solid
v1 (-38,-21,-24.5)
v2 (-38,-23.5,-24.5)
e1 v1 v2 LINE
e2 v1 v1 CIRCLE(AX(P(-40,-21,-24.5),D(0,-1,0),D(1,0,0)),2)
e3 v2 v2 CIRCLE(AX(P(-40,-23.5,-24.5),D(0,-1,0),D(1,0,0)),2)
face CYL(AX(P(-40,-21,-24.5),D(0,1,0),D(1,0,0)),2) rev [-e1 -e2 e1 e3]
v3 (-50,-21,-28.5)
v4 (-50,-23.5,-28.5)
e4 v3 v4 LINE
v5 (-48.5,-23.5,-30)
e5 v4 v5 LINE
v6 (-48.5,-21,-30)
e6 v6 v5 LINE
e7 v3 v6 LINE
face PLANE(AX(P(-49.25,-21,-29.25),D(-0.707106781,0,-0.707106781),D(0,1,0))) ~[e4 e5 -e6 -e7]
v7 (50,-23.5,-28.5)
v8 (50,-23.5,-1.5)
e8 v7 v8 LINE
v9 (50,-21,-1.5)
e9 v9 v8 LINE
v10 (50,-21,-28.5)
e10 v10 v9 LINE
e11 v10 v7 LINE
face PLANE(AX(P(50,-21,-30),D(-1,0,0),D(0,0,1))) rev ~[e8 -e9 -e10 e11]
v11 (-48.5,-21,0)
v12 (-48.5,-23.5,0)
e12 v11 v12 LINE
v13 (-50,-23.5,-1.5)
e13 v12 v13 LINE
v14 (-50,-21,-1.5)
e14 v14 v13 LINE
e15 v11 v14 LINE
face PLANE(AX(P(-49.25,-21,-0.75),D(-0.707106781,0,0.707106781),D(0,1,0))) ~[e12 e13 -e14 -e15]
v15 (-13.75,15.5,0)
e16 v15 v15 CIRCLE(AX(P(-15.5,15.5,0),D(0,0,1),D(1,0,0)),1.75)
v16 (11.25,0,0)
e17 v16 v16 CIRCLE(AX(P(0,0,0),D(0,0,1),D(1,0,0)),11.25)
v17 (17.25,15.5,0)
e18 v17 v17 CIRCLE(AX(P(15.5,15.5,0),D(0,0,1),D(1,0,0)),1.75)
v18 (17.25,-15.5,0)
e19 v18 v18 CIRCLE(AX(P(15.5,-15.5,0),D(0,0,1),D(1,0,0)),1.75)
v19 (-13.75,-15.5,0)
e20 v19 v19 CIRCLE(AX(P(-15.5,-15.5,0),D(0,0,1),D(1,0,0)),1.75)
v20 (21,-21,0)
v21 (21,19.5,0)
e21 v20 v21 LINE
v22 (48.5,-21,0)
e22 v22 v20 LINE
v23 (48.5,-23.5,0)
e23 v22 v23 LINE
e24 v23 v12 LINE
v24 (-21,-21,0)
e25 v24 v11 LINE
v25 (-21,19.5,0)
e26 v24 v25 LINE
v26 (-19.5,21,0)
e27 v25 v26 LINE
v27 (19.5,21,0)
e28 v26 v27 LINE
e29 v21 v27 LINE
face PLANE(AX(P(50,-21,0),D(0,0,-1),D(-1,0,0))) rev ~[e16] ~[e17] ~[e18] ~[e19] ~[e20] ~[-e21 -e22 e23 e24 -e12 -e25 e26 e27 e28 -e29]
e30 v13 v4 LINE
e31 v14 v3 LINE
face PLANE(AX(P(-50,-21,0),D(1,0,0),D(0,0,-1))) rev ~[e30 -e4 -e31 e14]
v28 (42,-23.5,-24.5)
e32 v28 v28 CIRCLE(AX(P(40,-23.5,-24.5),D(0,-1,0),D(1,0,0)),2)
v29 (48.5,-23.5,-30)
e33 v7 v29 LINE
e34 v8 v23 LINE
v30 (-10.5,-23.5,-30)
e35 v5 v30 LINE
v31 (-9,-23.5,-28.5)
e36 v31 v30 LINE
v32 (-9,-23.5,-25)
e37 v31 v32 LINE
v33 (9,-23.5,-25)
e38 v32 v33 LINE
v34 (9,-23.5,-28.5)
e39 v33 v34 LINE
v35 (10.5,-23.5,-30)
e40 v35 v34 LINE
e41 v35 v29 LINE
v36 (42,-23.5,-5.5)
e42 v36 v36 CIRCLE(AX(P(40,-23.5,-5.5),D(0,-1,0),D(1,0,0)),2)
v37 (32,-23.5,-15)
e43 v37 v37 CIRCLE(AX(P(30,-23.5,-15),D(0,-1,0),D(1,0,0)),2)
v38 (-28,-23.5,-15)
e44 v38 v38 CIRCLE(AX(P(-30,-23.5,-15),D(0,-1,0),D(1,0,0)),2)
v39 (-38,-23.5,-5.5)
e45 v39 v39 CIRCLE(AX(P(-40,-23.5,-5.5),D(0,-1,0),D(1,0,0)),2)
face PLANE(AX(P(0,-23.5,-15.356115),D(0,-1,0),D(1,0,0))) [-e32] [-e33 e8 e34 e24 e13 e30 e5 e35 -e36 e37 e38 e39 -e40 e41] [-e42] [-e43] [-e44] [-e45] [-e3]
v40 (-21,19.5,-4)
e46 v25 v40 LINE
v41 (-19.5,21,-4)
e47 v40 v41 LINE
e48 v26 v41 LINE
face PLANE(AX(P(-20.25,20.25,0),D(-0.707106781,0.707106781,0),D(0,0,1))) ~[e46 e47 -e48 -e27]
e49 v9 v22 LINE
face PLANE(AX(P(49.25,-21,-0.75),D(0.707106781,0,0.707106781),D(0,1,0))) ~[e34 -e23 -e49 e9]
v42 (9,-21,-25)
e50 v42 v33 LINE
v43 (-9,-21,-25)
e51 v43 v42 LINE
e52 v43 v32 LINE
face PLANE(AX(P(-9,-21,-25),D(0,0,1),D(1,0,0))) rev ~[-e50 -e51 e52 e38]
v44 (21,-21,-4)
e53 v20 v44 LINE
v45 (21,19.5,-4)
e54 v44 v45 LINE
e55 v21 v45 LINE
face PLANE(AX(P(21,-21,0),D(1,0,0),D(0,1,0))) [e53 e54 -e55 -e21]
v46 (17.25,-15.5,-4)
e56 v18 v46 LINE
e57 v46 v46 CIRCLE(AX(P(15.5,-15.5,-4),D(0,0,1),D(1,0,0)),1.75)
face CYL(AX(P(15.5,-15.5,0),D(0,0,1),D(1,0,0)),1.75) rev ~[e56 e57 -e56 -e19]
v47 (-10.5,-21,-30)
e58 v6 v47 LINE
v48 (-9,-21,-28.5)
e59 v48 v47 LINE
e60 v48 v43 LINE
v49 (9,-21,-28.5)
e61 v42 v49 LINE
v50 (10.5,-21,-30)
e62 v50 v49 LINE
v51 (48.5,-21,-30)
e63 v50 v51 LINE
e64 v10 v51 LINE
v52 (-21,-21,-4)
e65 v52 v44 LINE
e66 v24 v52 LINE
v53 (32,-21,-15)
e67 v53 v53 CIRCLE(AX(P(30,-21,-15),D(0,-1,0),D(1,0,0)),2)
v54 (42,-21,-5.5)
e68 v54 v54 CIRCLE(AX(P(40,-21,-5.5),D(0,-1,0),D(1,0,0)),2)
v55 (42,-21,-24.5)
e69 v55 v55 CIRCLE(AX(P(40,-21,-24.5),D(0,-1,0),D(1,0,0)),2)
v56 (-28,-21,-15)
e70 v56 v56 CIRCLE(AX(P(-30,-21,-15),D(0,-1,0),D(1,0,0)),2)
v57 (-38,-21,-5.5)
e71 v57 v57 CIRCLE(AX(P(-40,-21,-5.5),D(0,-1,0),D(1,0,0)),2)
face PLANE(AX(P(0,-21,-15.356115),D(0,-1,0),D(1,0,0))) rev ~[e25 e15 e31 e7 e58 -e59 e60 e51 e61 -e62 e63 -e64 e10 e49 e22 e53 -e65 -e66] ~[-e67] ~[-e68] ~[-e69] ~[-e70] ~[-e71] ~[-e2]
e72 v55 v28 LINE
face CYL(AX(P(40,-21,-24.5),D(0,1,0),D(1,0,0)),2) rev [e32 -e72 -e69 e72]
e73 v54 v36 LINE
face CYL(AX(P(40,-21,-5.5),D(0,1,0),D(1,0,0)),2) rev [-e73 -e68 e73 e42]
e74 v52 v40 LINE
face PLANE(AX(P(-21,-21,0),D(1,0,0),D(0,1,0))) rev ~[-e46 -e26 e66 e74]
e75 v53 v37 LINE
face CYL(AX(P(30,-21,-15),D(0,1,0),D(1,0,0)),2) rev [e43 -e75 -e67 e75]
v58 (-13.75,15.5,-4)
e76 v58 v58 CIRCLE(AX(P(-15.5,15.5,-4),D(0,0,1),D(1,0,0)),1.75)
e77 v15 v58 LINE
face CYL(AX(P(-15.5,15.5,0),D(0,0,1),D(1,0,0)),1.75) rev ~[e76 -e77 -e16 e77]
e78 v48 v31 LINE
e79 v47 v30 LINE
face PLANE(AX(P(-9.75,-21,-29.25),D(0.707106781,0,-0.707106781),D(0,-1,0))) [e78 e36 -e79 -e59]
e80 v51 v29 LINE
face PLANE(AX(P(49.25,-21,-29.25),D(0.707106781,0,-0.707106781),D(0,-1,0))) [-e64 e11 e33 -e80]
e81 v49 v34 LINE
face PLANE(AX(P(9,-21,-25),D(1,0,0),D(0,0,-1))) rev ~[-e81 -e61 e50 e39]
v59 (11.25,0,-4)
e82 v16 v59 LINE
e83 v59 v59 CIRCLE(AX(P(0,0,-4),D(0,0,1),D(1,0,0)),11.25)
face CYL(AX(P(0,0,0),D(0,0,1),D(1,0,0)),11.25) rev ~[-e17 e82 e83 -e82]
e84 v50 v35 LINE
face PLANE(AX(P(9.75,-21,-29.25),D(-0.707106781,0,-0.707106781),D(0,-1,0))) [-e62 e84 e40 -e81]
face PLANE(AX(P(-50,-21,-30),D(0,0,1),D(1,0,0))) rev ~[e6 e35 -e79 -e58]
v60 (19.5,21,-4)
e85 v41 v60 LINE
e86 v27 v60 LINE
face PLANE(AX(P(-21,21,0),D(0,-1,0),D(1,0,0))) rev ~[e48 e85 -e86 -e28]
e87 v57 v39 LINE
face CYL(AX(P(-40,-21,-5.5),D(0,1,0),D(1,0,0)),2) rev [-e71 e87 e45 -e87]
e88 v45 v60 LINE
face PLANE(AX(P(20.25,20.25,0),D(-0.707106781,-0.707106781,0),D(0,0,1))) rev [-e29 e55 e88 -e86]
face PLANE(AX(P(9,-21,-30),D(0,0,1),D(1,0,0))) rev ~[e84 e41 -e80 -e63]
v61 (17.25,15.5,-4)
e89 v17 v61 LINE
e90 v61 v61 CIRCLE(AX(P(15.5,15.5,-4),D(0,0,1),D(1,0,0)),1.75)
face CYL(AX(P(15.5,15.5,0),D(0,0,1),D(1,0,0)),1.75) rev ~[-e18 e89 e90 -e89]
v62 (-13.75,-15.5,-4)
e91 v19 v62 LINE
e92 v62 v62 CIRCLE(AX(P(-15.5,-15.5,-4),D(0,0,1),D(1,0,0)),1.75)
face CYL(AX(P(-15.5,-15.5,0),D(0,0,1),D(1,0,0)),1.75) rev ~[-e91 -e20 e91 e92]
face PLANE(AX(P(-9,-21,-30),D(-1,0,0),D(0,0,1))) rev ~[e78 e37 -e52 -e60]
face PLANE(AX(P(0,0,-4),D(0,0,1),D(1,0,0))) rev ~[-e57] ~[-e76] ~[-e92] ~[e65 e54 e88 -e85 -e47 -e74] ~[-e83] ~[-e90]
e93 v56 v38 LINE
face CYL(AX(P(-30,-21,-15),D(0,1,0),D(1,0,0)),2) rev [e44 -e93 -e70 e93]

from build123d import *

# Parameters (mm, degrees)
F0_W     = 42
F0_H     = 42
F0_R     = 1.75
F0_R_2   = 11.25
F1_DEPTH = 4
F2_R     = 2
F2_W     = 42
F2_H     = 4
F3_DEPTH = 2.5
F4_SIZE  = 1.5


# Not quite as in the source:
# - a feature names something its author has since deleted; it is built from what else it names


with BuildPart() as f1:
    # F0 (on Top) → F1 (new body)
    with BuildSketch(Plane.XY):
        Rectangle(F0_W, F0_H)
        with Locations((-15.5, -15.5)):
            Circle(F0_R, mode=Mode.SUBTRACT)
        with Locations((15.5, -15.5)):
            Circle(F0_R, mode=Mode.SUBTRACT)
        with Locations((-15.5, 15.5)):
            Circle(F0_R, mode=Mode.SUBTRACT)
        Circle(F0_R_2, mode=Mode.SUBTRACT)
        with Locations((15.5, 15.5)):
            Circle(F0_R, mode=Mode.SUBTRACT)
    extrude(amount=-F1_DEPTH)

    # F2 (on face) → F3 (join)
    with BuildSketch(Plane.XZ.offset(21)):
        Polygon((50, -30), (50, 0), (21, 0), (21, -4), (-21, -4), (-21, 0), (-50, 0), (-50, -30), (-9, -30), (-9, -25), (9, -25), (9, -30), align=None)
        with Locations((-40, -24.5)):
            Circle(F2_R, mode=Mode.SUBTRACT)
        with Locations((40, -24.5)):
            Circle(F2_R, mode=Mode.SUBTRACT)
        with Locations((-30, -15)):
            Circle(F2_R, mode=Mode.SUBTRACT)
        with Locations((-40, -5.5)):
            Circle(F2_R, mode=Mode.SUBTRACT)
        with Locations((30, -15)):
            Circle(F2_R, mode=Mode.SUBTRACT)
        with Locations((40, -5.5)):
            Circle(F2_R, mode=Mode.SUBTRACT)
        with Locations((0, -2)):
            Rectangle(F2_W, F2_H)
    extrude(amount=F3_DEPTH)

    # F4
    f4_edges = [f1.edges().sort_by_distance(p)[0] for p in [
        (-21, 21, -2),
        (21, 21, -2),
        (-50, -22.25, 0),
        (-50, -22.25, -30),
        (50, -22.25, -30),
        (50, -22.25, 0),
        (-9, -22.25, -30),
        (9, -22.25, -30),
    ]]
    chamfer(f4_edges, length=F4_SIZE)


solid = f1.part
